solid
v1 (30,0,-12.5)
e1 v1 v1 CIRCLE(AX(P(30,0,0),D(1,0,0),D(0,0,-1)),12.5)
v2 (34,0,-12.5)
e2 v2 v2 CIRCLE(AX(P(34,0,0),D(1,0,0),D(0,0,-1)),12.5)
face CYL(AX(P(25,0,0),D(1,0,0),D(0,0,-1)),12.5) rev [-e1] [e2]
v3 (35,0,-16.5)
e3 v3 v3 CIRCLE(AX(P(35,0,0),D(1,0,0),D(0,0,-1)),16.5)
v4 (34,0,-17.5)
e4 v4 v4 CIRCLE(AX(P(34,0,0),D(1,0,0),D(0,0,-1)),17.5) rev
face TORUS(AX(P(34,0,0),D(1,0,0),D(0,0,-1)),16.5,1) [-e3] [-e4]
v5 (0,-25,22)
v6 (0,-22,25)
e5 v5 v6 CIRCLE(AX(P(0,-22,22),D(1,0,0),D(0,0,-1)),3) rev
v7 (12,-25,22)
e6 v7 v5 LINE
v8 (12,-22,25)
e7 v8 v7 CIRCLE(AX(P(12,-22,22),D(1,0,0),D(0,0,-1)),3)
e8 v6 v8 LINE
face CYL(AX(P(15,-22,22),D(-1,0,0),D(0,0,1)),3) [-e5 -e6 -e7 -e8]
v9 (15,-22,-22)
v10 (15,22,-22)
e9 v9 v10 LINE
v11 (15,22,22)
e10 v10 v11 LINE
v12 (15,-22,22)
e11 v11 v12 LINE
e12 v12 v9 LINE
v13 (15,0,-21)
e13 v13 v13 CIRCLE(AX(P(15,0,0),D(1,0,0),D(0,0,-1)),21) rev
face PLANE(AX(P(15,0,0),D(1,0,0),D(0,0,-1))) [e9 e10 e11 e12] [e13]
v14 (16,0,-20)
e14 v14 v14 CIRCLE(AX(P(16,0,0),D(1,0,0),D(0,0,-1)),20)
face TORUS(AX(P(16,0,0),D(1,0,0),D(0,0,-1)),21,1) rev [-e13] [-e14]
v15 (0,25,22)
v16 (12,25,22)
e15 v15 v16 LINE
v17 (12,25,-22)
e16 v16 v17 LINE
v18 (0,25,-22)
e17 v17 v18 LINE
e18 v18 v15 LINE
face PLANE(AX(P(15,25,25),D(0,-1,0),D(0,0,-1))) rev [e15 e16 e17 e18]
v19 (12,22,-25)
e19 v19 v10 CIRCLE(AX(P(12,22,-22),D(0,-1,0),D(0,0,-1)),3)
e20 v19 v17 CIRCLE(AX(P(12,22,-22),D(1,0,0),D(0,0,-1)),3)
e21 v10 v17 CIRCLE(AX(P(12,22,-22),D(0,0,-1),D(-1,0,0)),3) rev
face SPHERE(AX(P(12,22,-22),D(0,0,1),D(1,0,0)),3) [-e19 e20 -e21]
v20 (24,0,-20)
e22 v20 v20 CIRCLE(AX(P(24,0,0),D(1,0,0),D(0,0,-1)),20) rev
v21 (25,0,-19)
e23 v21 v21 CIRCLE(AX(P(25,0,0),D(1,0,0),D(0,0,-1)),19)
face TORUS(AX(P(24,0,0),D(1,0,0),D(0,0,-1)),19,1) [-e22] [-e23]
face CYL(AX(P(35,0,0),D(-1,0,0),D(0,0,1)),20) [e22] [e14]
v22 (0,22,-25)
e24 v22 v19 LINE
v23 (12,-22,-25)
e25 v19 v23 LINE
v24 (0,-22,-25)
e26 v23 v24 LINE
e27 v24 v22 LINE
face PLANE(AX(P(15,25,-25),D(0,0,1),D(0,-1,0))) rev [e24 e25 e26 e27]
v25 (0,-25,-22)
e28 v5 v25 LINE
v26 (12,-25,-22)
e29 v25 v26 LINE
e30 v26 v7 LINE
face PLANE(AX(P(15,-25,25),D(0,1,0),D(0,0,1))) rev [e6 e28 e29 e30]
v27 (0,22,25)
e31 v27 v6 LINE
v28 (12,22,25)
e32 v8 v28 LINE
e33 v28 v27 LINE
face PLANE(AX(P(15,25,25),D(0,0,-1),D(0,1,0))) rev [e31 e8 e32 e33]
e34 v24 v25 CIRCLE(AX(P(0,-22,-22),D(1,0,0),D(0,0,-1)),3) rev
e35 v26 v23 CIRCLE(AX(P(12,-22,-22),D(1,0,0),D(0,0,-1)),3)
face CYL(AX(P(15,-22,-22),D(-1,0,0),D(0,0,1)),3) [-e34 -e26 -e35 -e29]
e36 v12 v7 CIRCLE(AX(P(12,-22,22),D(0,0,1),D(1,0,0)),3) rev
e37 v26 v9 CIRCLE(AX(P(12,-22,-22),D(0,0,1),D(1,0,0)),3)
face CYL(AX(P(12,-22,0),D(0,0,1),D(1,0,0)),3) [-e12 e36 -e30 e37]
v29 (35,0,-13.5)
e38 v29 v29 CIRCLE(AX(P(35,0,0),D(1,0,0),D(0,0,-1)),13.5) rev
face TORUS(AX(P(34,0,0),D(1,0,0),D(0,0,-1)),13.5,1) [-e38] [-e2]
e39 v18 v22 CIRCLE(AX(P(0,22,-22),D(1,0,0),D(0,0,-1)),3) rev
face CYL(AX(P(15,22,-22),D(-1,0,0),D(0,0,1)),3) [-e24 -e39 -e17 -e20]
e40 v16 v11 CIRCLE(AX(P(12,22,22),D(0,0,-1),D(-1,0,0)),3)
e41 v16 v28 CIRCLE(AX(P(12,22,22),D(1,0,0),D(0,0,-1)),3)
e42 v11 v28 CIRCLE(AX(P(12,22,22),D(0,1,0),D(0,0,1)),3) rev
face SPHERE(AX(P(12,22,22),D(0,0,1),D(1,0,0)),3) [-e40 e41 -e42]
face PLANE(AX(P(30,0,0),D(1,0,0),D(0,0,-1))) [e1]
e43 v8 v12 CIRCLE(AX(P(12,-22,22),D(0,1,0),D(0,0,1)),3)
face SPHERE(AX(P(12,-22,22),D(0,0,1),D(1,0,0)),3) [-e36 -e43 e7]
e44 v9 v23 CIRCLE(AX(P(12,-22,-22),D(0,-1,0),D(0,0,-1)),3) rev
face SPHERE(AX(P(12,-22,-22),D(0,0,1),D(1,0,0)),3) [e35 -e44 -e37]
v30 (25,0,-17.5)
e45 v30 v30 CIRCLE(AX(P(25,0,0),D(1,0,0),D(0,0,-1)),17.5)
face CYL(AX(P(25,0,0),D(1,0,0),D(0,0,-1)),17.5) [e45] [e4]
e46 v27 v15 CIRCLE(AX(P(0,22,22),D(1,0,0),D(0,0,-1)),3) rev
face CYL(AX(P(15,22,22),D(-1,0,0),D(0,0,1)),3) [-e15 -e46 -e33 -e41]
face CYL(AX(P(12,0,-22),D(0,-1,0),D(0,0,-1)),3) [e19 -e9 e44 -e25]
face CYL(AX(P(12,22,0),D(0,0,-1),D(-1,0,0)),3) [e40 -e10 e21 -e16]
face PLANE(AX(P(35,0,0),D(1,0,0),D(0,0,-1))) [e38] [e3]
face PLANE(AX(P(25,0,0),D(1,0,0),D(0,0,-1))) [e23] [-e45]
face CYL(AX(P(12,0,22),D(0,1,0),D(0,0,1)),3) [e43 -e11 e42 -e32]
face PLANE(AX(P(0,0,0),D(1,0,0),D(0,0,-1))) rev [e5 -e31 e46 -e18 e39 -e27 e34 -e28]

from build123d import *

# Parameters (mm, degrees)
SKETCH1_W           = 50
SKETCH1_H           = 50
BOSS_EXTRUDE1_DEPTH = 15
SKETCH2_R           = 20
BOSS_EXTRUDE2_DEPTH = 20
CUT_EXTRUDE1_START  = -10
SKETCH3_R           = 20
SKETCH3_R_2         = 17.5
SKETCH3_R_3         = 12.5
CUT_EXTRUDE1_DEPTH  = 10
SKETCH4_R           = 12.5
BOSS_EXTRUDE3_DEPTH = 5
FILLET1_R           = 1
FILLET2_R           = 3
FILLET3_R           = 3


with BuildPart() as part:
    # Sketch1 → Boss-Extrude1 (new body)
    with BuildSketch(Plane(origin=(0, 0, 0), x_dir=(0, 0, -1), z_dir=(1, 0, 0))):
        Rectangle(SKETCH1_W, SKETCH1_H)
    extrude(amount=BOSS_EXTRUDE1_DEPTH)

    # Sketch2 → Boss-Extrude2 (add)
    with BuildSketch(Plane(origin=(15, 0, 0), x_dir=(0, 0, -1), z_dir=(1, 0, 0))):
        Circle(SKETCH2_R)
    extrude(amount=BOSS_EXTRUDE2_DEPTH)

    # Sketch3 → Cut-Extrude1 (cut)
    # profile 1 of 2: a face of its own
    with BuildSketch(Plane(origin=(35, 0, 0), x_dir=(0, 0, -1), z_dir=(1, 0, 0)).offset(CUT_EXTRUDE1_START)):
        Circle(SKETCH3_R)
        Circle(SKETCH3_R_2, mode=Mode.SUBTRACT)
    # profile 2 of 2: a face of its own
    with BuildSketch(Plane(origin=(35, 0, 0), x_dir=(0, 0, -1), z_dir=(1, 0, 0)).offset(CUT_EXTRUDE1_START)):
        Circle(SKETCH3_R_3)
    extrude(amount=CUT_EXTRUDE1_DEPTH, mode=Mode.SUBTRACT)

    # Sketch4 → Boss-Extrude3 (add)
    with BuildSketch(Plane(origin=(25, 0, 0), x_dir=(0, 0, -1), z_dir=(1, 0, 0))):
        Circle(SKETCH4_R)
    extrude(amount=BOSS_EXTRUDE3_DEPTH)

    # Fillet1
    fillet1_edges = [part.edges().sort_by_distance(p)[0] for p in [
        (15, 0, 20),
        (35, 0, 12.5),
        (35, 0, 17.5),
        (25, 0, 20),
    ]]
    fillet(fillet1_edges, radius=FILLET1_R)

    # Fillet2
    fillet2_edges = [part.edges().sort_by_distance(p)[0] for p in [
        (15, 0, 25),
        (15, -25, 0),
        (15, 0, -25),
        (15, 25, 0),
    ]]
    fillet(fillet2_edges, radius=FILLET2_R)

    # Fillet3
    # the kernel refuses this fillet: 3 mm, written as the material it takes off along each edge
    with BuildSketch(Plane(origin=(12, 22, 22), x_dir=(0, 1, 0), z_dir=(0, 0, 1))) as fillet3_piece_1_section:
        Polygon((0, 0), (FILLET3_R, 0), (FILLET3_R, -FILLET3_R), (0, -FILLET3_R), align=None)
    fillet3_piece_1 = extrude(amount=FILLET3_R, mode=Mode.PRIVATE)
    fillet3_piece_1 = fillet3_piece_1 - Plane(origin=(12, 22, 22), x_dir=(-0.7071067811865475, -0.7071067811865475, 0), z_dir=(0, 0, 1)) * Sphere(FILLET3_R, mode=Mode.PRIVATE)
    add(fillet3_piece_1, mode=Mode.SUBTRACT)
    with BuildSketch(Plane(origin=(12, 22, -22), x_dir=(0, 0, -1), z_dir=(0, 1, 0))) as fillet3_piece_2_section:
        Polygon((0, 0), (FILLET3_R, 0), (FILLET3_R, -FILLET3_R), (0, -FILLET3_R), align=None)
    fillet3_piece_2 = extrude(amount=FILLET3_R, mode=Mode.PRIVATE)
    fillet3_piece_2 = fillet3_piece_2 - Plane(origin=(12, 22, -22), x_dir=(-0.7071067811865475, 0, 0.7071067811865475), z_dir=(0, 1, 0)) * Sphere(FILLET3_R, mode=Mode.PRIVATE)
    add(fillet3_piece_2, mode=Mode.SUBTRACT)
    with BuildSketch(Plane(origin=(12, -22, 22), x_dir=(0, -1, 0), z_dir=(0, 0, 1))) as fillet3_piece_3_section:
        Polygon((0, 0), (FILLET3_R, 0), (FILLET3_R, FILLET3_R), (0, FILLET3_R), align=None)
    fillet3_piece_3 = extrude(amount=FILLET3_R, mode=Mode.PRIVATE)
    fillet3_piece_3 = fillet3_piece_3 - Plane(origin=(12, -22, 22), x_dir=(-0.7071067811865475, 0.7071067811865475, 0), z_dir=(0, 0, 1)) * Sphere(FILLET3_R, mode=Mode.PRIVATE)
    add(fillet3_piece_3, mode=Mode.SUBTRACT)
    with BuildSketch(Plane(origin=(12, -22, -22), x_dir=(0, 0, -1), z_dir=(0, -1, 0))) as fillet3_piece_4_section:
        Polygon((0, 0), (FILLET3_R, 0), (FILLET3_R, FILLET3_R), (0, FILLET3_R), align=None)
    fillet3_piece_4 = extrude(amount=FILLET3_R, mode=Mode.PRIVATE)
    fillet3_piece_4 = fillet3_piece_4 - Plane(origin=(12, -22, -22), x_dir=(-0.7071067811865475, 0, 0.7071067811865475), z_dir=(0, -1, 0)) * Sphere(FILLET3_R, mode=Mode.PRIVATE)
    add(fillet3_piece_4, mode=Mode.SUBTRACT)
    with BuildSketch(Plane(origin=(-7.5, -25, -25), x_dir=(0, 0, 1), z_dir=(1, 0, 0)), Plane(origin=(-7.5, -25, 25), x_dir=(0, 1, 0), z_dir=(1, 0, 0))) as fillet3_piece_5:
        with BuildLine():
            CenterArc((FILLET3_R, -FILLET3_R), FILLET3_R, 90, 90)
            Line((0, -FILLET3_R), (0, 0))
            Line((0, 0), (FILLET3_R, 0))
        make_face()
    extrude(amount=19.5, mode=Mode.SUBTRACT)
    with BuildSketch(Plane(origin=(-7.5, 25, -25), x_dir=(0, 0, 1), z_dir=(1, 0, 0)), Plane(origin=(-7.5, 25, 25), x_dir=(0, -1, 0), z_dir=(1, 0, 0))) as fillet3_piece_6:
        with BuildLine():
            CenterArc((FILLET3_R, FILLET3_R), FILLET3_R, 180, 90)
            Line((0, FILLET3_R), (0, 0))
            Line((0, 0), (FILLET3_R, 0))
        make_face()
    extrude(amount=19.5, mode=Mode.SUBTRACT)


solid = part.part
